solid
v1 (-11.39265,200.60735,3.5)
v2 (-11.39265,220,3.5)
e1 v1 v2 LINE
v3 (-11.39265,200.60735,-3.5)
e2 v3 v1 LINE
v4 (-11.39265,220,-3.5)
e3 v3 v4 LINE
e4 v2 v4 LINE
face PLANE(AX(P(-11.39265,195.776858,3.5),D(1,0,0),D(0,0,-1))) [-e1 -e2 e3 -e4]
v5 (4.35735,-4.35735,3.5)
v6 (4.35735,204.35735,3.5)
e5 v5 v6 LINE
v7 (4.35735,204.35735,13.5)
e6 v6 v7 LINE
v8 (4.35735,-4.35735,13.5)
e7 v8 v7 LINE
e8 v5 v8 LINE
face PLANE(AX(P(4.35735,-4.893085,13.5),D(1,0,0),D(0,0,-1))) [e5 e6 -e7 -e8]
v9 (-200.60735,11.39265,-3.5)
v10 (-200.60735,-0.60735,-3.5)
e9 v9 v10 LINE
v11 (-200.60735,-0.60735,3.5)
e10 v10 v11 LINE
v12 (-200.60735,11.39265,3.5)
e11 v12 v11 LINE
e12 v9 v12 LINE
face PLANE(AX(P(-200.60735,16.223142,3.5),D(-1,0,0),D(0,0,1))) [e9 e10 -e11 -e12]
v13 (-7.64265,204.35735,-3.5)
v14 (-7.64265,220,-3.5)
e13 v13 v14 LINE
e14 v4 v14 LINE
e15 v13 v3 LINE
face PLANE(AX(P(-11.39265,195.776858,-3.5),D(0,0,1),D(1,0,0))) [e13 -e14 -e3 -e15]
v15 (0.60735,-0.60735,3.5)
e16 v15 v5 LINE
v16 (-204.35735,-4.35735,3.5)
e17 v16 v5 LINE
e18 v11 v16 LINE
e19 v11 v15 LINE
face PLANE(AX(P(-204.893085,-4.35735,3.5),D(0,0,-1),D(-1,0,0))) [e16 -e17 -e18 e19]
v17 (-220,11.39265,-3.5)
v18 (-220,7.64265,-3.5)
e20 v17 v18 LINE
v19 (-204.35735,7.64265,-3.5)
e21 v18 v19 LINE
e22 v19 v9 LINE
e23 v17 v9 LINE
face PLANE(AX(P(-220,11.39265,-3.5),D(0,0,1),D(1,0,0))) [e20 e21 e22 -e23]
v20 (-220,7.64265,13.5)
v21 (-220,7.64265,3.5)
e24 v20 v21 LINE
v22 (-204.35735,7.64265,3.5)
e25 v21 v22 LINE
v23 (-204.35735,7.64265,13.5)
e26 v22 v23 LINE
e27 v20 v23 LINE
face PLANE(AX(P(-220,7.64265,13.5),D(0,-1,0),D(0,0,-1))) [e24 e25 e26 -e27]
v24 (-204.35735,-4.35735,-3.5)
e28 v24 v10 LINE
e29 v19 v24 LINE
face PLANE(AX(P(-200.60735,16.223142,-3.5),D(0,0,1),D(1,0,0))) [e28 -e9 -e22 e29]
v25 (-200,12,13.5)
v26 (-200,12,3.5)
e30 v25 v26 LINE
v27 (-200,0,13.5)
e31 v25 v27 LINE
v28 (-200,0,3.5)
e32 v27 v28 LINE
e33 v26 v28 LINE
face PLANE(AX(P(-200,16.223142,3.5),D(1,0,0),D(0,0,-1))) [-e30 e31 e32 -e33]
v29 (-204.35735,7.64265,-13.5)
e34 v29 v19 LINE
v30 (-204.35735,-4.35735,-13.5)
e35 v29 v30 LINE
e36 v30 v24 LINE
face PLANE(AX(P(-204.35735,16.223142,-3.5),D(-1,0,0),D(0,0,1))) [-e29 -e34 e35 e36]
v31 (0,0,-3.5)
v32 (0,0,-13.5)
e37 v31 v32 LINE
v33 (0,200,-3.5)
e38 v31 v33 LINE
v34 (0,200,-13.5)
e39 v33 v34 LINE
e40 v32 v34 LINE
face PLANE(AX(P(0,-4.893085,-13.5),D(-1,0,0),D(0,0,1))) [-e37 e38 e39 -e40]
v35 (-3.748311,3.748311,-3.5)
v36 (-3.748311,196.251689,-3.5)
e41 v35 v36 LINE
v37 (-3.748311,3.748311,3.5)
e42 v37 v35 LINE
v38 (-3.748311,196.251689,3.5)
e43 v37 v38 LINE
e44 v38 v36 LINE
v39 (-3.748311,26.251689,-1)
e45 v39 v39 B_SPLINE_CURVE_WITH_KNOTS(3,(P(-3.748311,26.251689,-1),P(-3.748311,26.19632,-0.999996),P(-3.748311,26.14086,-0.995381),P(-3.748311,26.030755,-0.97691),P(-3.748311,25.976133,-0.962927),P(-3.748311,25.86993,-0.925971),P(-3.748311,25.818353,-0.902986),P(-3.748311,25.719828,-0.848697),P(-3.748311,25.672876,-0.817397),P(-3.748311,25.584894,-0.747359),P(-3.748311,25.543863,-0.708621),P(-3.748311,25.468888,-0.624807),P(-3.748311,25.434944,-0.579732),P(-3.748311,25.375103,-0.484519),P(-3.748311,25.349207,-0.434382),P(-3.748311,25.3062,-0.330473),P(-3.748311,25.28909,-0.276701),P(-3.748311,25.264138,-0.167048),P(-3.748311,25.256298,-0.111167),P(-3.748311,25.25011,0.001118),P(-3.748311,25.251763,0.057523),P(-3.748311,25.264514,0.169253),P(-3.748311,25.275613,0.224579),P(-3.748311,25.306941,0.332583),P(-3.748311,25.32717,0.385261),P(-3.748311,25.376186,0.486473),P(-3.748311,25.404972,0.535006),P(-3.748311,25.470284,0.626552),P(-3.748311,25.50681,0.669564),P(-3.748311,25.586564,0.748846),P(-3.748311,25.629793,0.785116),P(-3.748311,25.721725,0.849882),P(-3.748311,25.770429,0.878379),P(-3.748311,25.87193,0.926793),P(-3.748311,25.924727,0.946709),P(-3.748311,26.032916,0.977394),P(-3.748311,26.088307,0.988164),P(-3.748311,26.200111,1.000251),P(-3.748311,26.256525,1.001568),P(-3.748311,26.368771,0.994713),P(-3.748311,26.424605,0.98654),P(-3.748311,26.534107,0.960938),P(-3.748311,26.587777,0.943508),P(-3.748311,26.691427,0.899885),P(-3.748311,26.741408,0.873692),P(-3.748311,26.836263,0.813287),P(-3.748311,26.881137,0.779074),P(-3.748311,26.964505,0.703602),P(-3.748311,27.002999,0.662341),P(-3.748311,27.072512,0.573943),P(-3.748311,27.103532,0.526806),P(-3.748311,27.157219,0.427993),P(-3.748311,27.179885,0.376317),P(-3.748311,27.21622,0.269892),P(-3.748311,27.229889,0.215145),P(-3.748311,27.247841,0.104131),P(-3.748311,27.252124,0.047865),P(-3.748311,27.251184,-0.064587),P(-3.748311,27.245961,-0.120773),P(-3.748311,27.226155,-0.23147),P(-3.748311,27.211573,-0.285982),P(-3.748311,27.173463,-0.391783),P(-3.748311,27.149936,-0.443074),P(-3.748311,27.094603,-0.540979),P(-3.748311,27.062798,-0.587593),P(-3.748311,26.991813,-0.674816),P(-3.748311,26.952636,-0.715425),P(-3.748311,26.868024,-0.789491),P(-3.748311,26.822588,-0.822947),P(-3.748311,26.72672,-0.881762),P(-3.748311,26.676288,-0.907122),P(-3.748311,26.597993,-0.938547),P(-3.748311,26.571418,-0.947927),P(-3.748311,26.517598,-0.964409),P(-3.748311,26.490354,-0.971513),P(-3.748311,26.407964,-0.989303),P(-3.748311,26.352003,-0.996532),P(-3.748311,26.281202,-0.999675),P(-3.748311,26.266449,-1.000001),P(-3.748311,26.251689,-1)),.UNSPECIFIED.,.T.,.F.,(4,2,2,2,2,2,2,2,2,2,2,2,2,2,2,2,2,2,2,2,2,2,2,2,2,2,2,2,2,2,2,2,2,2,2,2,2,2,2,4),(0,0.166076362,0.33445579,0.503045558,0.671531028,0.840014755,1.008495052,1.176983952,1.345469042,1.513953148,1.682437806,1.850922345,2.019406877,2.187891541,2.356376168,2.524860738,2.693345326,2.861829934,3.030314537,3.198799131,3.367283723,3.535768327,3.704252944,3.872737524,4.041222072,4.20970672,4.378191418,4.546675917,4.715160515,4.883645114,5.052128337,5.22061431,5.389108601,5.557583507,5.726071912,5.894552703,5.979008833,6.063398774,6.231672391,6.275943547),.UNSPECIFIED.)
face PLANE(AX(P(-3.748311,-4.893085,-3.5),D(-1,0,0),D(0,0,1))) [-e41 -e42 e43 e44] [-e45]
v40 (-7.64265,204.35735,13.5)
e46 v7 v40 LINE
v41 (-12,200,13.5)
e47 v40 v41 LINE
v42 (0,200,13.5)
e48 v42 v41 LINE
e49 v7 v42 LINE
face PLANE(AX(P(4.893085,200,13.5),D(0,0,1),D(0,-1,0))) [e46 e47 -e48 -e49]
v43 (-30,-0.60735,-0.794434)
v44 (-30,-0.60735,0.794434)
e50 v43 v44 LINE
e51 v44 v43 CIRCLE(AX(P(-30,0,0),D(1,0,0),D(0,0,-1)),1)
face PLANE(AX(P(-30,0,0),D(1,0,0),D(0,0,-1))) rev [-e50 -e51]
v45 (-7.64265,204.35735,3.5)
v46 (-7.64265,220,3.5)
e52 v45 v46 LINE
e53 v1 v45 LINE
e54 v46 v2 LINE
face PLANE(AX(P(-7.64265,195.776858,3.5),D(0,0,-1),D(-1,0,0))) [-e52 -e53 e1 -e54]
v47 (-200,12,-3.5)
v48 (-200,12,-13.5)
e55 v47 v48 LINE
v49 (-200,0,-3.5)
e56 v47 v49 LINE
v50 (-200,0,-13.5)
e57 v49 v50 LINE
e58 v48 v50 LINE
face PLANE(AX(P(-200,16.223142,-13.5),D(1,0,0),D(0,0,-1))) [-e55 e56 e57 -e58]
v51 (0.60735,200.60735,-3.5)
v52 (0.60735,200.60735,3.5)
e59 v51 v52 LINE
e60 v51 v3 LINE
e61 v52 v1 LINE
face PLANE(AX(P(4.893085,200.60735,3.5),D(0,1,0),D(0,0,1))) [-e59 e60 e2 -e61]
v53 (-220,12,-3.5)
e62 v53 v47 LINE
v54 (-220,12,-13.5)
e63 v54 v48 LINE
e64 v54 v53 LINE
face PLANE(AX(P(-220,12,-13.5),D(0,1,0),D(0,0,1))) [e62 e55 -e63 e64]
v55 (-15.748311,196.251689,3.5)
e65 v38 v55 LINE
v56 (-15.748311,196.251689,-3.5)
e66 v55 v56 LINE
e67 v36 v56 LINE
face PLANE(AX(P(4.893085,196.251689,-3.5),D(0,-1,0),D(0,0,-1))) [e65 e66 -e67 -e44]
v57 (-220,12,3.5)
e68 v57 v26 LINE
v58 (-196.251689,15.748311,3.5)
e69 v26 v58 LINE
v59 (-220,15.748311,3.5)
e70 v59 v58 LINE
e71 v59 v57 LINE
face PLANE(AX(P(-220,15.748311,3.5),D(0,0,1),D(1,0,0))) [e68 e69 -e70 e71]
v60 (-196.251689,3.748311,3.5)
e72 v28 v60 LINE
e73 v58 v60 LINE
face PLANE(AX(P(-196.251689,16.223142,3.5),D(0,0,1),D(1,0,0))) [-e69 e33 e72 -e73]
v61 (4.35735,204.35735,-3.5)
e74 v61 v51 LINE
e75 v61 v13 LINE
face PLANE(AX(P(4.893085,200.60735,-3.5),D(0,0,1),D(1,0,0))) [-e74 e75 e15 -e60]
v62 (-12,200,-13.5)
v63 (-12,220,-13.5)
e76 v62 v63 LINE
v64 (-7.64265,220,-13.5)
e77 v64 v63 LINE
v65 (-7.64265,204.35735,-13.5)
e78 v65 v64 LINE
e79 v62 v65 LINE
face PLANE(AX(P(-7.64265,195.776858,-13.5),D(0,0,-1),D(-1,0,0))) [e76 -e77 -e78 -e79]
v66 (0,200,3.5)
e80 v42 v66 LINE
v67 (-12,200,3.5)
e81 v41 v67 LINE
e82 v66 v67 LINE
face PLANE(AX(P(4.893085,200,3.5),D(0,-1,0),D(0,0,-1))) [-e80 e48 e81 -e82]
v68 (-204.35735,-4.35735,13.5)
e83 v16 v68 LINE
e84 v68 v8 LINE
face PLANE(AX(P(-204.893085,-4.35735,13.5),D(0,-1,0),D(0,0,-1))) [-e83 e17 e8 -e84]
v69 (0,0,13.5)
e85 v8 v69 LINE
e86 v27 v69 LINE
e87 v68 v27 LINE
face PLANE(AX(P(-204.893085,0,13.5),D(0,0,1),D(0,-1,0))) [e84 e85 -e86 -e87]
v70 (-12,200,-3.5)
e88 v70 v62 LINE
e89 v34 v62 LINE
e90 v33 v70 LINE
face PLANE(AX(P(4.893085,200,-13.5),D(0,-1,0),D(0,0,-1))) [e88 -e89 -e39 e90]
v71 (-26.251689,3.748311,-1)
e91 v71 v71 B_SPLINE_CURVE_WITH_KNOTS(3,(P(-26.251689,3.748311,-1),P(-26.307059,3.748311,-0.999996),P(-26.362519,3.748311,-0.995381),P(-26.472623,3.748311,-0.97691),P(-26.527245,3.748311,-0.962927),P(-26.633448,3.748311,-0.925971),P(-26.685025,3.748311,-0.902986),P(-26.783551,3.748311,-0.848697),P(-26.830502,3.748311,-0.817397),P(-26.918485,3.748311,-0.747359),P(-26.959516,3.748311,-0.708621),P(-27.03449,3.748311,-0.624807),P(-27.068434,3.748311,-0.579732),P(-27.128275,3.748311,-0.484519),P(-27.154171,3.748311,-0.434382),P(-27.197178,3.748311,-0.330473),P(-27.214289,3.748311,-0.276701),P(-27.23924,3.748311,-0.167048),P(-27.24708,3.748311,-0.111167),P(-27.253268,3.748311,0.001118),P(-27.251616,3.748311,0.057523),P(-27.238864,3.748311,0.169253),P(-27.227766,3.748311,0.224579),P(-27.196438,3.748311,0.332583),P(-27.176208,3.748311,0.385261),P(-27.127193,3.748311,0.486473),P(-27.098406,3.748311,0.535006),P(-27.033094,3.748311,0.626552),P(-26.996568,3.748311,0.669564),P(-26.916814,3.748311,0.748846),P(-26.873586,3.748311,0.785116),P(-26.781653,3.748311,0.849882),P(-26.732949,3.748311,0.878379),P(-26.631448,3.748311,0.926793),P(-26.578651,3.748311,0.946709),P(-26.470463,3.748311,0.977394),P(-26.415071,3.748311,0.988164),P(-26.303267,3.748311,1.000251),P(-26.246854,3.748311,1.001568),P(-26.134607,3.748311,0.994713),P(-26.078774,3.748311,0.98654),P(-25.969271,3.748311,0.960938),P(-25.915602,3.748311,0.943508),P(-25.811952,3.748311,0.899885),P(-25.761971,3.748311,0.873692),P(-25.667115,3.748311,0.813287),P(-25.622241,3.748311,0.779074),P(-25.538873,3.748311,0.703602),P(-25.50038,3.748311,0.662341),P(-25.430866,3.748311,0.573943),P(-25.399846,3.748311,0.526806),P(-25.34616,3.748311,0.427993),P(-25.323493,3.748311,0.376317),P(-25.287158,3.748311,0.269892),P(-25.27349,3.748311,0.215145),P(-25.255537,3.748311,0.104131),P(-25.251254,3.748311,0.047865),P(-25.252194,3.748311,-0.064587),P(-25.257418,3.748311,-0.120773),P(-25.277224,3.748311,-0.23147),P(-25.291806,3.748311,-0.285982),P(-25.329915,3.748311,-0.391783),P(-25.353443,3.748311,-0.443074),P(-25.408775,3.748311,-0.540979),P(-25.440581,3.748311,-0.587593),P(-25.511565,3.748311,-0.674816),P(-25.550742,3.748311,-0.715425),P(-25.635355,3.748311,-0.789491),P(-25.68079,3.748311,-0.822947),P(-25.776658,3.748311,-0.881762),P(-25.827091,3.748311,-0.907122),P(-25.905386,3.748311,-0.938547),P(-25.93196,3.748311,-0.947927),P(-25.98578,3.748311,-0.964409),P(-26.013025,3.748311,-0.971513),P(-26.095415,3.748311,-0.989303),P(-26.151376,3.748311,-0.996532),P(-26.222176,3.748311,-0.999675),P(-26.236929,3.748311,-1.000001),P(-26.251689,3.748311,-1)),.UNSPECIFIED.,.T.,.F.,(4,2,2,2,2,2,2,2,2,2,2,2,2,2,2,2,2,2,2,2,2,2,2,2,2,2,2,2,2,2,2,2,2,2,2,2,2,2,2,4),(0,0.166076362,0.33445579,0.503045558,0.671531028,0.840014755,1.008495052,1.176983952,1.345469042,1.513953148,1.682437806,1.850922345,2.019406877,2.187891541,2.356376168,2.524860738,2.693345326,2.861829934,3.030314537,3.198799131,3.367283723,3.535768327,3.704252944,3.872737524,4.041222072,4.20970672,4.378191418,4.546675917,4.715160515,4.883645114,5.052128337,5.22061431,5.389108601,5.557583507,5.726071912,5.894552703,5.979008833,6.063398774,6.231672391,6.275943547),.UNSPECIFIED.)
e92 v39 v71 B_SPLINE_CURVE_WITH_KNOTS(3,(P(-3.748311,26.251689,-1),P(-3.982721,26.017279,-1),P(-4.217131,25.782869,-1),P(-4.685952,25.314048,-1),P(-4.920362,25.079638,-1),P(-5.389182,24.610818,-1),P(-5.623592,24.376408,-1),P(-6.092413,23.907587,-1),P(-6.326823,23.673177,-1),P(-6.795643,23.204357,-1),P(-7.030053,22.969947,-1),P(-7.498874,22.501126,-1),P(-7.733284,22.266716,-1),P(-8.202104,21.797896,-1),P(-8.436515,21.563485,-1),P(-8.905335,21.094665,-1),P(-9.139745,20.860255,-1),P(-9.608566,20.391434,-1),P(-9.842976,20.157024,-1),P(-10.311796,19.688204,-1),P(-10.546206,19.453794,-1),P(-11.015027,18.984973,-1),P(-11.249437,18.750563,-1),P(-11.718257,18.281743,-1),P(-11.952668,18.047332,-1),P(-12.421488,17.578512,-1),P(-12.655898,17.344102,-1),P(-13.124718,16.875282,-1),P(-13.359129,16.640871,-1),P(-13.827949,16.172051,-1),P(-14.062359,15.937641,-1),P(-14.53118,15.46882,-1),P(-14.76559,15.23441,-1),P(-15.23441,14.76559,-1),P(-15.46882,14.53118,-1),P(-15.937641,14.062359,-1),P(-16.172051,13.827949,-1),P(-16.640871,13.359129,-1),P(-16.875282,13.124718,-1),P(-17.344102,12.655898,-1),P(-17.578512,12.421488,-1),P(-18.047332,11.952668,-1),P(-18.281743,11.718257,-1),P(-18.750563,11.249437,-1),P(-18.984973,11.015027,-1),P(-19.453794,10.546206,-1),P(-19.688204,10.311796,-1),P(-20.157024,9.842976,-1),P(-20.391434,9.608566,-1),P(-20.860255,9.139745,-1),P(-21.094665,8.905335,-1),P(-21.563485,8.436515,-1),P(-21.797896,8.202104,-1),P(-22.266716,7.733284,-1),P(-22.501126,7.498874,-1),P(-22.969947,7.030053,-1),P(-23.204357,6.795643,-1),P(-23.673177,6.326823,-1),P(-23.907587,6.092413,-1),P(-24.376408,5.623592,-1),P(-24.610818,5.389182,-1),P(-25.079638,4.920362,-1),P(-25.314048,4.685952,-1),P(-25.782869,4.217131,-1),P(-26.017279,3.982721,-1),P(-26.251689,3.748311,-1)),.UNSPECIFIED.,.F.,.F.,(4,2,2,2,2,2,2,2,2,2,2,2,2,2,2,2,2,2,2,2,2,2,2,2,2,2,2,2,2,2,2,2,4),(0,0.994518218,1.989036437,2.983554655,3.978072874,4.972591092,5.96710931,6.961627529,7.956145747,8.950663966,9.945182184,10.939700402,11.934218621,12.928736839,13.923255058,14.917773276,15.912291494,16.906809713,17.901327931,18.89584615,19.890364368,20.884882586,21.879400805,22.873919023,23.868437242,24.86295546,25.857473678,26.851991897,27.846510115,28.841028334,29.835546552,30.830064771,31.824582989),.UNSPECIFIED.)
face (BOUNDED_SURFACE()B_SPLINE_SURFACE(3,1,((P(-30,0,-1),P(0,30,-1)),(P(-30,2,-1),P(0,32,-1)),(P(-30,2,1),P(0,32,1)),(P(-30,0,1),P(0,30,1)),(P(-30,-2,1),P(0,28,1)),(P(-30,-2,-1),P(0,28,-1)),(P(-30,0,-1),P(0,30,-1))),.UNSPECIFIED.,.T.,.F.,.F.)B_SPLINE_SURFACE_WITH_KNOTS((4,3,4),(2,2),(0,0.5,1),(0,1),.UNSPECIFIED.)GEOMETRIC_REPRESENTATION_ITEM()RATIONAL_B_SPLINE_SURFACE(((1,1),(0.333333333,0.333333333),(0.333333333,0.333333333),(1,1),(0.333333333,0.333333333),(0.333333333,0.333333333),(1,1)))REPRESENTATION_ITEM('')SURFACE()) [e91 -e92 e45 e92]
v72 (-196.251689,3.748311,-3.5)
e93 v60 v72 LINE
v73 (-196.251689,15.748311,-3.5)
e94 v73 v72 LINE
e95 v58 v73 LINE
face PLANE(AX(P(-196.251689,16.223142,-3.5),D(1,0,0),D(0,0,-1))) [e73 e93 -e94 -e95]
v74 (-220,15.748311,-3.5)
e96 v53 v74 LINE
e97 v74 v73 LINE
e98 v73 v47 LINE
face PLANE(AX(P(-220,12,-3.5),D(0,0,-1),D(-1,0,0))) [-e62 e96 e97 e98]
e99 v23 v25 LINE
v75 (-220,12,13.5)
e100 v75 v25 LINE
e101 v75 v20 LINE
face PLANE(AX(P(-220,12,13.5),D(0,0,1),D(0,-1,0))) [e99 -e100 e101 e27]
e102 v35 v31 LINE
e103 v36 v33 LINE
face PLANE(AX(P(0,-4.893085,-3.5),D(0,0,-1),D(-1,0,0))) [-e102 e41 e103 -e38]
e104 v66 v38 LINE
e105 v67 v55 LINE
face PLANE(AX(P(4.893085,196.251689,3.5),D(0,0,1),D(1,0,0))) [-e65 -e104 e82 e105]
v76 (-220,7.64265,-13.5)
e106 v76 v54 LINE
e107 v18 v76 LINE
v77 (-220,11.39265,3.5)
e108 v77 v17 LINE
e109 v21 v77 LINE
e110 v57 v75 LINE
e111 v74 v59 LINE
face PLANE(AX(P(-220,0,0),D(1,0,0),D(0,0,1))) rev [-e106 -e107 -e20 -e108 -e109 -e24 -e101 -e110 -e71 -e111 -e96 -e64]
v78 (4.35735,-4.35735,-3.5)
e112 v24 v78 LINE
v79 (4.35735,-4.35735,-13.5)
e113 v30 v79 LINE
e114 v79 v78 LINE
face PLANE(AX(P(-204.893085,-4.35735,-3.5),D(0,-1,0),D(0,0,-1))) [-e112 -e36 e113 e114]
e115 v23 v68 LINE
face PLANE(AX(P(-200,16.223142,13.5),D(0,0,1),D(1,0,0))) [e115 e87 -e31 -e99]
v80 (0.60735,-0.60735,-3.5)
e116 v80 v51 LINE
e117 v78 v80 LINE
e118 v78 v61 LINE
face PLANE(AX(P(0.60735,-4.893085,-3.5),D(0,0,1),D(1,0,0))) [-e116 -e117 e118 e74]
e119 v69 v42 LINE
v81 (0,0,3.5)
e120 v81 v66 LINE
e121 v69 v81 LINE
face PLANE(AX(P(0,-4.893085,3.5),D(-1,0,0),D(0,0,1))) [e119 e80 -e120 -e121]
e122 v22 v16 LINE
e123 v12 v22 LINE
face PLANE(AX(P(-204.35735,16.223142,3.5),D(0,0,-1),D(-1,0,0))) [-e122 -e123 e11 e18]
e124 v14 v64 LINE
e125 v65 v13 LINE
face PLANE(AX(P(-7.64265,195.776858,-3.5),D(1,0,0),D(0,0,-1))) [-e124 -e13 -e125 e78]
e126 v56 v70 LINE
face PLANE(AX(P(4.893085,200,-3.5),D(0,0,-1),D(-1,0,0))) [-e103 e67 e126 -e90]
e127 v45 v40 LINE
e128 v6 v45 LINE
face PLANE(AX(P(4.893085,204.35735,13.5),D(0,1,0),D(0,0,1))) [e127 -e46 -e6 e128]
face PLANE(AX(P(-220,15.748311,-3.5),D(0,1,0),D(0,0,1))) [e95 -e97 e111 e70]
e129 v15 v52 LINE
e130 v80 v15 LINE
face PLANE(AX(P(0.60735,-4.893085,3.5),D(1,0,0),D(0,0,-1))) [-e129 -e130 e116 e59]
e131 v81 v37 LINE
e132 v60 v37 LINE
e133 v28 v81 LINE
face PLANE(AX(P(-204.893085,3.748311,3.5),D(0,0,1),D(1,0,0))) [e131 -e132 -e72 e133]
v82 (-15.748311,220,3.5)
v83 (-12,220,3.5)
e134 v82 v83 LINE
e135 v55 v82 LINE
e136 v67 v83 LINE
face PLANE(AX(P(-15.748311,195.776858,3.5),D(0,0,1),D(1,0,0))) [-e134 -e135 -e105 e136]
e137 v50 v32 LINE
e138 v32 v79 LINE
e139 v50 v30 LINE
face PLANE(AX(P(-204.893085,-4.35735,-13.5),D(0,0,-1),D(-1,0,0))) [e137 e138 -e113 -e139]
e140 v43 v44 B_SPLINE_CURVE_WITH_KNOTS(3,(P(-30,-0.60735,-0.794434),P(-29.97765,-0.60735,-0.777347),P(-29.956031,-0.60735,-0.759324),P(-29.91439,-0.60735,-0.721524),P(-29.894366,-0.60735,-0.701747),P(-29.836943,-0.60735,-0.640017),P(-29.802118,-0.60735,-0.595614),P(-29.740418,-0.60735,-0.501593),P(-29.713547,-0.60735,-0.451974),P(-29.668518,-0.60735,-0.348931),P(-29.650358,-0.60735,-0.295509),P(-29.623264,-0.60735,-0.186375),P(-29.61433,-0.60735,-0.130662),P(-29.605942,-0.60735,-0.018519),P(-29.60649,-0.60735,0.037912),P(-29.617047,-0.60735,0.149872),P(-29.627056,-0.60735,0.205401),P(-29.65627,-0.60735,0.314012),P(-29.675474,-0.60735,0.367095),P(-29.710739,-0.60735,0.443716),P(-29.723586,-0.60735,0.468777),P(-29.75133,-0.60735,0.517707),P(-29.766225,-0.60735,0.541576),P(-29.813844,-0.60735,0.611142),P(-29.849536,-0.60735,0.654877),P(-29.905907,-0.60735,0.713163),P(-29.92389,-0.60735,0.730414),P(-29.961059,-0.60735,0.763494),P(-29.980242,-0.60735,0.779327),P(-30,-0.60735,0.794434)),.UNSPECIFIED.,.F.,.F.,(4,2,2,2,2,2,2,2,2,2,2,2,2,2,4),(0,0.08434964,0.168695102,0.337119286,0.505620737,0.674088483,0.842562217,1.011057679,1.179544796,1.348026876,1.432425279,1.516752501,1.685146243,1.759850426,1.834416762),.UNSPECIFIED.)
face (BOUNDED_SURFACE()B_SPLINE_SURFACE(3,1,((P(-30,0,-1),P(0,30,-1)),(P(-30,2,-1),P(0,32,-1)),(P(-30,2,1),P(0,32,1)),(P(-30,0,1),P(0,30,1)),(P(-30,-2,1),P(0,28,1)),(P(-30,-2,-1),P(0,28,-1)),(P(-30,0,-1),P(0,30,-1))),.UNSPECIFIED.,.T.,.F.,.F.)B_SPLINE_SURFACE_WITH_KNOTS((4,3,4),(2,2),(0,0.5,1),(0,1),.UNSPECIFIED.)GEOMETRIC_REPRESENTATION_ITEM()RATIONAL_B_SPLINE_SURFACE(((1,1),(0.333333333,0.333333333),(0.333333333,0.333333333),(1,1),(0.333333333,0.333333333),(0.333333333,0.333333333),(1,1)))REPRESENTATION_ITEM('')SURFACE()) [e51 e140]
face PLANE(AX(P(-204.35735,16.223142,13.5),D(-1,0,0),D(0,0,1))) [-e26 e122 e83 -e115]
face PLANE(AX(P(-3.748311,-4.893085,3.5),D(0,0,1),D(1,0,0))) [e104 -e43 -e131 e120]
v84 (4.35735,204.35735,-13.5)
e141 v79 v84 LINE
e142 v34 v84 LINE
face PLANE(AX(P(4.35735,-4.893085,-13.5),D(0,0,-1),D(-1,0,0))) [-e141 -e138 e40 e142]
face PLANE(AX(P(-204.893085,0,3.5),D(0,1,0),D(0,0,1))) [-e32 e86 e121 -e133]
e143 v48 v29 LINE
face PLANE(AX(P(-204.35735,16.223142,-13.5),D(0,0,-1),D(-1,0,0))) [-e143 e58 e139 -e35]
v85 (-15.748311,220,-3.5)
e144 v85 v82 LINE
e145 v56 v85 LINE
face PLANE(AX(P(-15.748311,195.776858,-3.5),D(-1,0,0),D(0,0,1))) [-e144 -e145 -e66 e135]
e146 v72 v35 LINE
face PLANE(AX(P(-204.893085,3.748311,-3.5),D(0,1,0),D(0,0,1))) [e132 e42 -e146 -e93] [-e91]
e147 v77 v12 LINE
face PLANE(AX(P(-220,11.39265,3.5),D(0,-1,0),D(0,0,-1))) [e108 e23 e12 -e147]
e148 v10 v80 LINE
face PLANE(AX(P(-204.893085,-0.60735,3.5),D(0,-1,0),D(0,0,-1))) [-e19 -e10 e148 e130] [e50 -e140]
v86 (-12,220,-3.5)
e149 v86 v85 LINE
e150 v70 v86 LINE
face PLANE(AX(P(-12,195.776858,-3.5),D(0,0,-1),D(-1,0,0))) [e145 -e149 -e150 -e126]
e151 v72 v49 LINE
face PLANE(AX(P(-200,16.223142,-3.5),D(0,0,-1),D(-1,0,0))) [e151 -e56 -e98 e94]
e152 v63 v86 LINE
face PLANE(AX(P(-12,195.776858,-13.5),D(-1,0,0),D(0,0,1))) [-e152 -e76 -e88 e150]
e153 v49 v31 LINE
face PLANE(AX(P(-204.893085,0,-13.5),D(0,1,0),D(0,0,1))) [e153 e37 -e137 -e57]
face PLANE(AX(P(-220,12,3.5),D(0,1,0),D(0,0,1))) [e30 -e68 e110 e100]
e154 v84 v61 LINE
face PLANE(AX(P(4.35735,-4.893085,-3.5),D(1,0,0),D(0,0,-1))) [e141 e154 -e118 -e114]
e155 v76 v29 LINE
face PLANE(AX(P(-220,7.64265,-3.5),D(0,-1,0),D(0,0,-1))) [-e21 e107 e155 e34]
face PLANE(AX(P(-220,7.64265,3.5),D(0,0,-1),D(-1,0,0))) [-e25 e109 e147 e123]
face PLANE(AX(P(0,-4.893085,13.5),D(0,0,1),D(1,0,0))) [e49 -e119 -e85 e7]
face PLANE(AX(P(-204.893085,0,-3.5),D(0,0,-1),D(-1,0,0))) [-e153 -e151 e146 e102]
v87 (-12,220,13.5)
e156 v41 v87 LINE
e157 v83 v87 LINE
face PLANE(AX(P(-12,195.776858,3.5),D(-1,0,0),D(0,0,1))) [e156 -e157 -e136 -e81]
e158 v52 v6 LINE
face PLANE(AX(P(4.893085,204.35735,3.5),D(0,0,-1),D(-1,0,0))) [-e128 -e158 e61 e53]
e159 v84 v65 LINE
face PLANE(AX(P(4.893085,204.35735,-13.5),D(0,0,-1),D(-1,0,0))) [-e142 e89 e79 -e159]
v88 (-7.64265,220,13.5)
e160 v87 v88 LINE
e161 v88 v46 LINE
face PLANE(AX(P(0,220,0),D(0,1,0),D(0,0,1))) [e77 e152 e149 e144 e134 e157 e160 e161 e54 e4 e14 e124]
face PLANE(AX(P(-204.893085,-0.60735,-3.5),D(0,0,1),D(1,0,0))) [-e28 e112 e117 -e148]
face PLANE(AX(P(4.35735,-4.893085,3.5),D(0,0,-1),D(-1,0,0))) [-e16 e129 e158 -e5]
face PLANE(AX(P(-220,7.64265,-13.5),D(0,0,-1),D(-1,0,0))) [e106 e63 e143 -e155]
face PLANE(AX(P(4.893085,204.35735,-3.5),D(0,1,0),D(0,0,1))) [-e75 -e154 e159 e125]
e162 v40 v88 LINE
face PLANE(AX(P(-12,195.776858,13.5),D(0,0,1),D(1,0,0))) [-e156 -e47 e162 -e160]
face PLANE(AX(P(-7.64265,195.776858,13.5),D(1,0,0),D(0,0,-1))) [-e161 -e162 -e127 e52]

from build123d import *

# Parameters (mm, degrees)
SWEEP1_START   = -13.5
SWEEP1_DEPTH   = 10
SWEEP1_START_2 = 3.5
SWEEP1_2_DEPTH = 10
SWEEP1_START_3 = -3.5
SWEEP1_3_DEPTH = 7
SKETCH12_R     = 1


# Read off the part's stored shape, not the designer's step: Sweep1
with BuildPart() as part:
    # Sweep1 outline → Sweep1 (new body)
    with BuildSketch(Plane.XY.offset(SWEEP1_START)):
        Polygon((-7.642649587, 204.357350413), (-7.642649587, 220), (-12, 220), (-12, 200), (0, 200), (0, 0), (-200, 0), (-200, 12), (-220, 12), (-220, 7.642649587), (-204.357350413, 7.642649587), (-204.357350413, -4.357350413), (4.357350413, -4.357350413), (4.357350413, 204.357350413), align=None)
    extrude(amount=SWEEP1_DEPTH)



with BuildPart() as body_2:
    # Sweep1 2 outline → Sweep1 2 (new body)
    with BuildSketch(Plane.XY.offset(SWEEP1_START_2)):
        Polygon((-7.642649587, 204.357350413), (-7.642649587, 220), (-12, 220), (-12, 200), (0, 200), (0, 0), (-200, 0), (-200, 12), (-220, 12), (-220, 7.642649587), (-204.357350413, 7.642649587), (-204.357350413, -4.357350413), (4.357350413, -4.357350413), (4.357350413, 204.357350413), align=None)
    extrude(amount=SWEEP1_2_DEPTH)


with BuildPart() as part_1:
    add(part.part)

    add(body_2.part)  # Sweep1 3 merges body 2
    # Sweep1 3 outline → Sweep1 3 (add)
    with BuildSketch(Plane.XY.offset(SWEEP1_START_3)):
        Polygon((-11.392649587, 200.607350413), (-11.392649587, 220), (-15.74831078, 220), (-15.74831078, 196.25168922), (-3.74831078, 196.25168922), (-3.74831078, 3.74831078), (-196.25168922, 3.74831078), (-196.25168922, 15.74831078), (-220, 15.74831078), (-220, 11.392649587), (-200.607350413, 11.392649587), (-200.607350413, -0.607350413), (0.607350413, -0.607350413), (0.607350413, 200.607350413), align=None)
    extrude(amount=SWEEP1_3_DEPTH)

    # Sweep2: sweep along a path in Sketch11
    with BuildLine(Plane.XY) as sweep2_path:
        Line((-30, 0), (0, 30))
    # Sketch12 → Sweep2 (sweep)
    with BuildSketch(Plane(origin=(0, 0, 0), x_dir=(0, 0, -1), z_dir=(1, 0, 0))):
        with Locations((0, 30)):
            Circle(SKETCH12_R)
    sweep(path=sweep2_path.line)


solid = part_1.part
